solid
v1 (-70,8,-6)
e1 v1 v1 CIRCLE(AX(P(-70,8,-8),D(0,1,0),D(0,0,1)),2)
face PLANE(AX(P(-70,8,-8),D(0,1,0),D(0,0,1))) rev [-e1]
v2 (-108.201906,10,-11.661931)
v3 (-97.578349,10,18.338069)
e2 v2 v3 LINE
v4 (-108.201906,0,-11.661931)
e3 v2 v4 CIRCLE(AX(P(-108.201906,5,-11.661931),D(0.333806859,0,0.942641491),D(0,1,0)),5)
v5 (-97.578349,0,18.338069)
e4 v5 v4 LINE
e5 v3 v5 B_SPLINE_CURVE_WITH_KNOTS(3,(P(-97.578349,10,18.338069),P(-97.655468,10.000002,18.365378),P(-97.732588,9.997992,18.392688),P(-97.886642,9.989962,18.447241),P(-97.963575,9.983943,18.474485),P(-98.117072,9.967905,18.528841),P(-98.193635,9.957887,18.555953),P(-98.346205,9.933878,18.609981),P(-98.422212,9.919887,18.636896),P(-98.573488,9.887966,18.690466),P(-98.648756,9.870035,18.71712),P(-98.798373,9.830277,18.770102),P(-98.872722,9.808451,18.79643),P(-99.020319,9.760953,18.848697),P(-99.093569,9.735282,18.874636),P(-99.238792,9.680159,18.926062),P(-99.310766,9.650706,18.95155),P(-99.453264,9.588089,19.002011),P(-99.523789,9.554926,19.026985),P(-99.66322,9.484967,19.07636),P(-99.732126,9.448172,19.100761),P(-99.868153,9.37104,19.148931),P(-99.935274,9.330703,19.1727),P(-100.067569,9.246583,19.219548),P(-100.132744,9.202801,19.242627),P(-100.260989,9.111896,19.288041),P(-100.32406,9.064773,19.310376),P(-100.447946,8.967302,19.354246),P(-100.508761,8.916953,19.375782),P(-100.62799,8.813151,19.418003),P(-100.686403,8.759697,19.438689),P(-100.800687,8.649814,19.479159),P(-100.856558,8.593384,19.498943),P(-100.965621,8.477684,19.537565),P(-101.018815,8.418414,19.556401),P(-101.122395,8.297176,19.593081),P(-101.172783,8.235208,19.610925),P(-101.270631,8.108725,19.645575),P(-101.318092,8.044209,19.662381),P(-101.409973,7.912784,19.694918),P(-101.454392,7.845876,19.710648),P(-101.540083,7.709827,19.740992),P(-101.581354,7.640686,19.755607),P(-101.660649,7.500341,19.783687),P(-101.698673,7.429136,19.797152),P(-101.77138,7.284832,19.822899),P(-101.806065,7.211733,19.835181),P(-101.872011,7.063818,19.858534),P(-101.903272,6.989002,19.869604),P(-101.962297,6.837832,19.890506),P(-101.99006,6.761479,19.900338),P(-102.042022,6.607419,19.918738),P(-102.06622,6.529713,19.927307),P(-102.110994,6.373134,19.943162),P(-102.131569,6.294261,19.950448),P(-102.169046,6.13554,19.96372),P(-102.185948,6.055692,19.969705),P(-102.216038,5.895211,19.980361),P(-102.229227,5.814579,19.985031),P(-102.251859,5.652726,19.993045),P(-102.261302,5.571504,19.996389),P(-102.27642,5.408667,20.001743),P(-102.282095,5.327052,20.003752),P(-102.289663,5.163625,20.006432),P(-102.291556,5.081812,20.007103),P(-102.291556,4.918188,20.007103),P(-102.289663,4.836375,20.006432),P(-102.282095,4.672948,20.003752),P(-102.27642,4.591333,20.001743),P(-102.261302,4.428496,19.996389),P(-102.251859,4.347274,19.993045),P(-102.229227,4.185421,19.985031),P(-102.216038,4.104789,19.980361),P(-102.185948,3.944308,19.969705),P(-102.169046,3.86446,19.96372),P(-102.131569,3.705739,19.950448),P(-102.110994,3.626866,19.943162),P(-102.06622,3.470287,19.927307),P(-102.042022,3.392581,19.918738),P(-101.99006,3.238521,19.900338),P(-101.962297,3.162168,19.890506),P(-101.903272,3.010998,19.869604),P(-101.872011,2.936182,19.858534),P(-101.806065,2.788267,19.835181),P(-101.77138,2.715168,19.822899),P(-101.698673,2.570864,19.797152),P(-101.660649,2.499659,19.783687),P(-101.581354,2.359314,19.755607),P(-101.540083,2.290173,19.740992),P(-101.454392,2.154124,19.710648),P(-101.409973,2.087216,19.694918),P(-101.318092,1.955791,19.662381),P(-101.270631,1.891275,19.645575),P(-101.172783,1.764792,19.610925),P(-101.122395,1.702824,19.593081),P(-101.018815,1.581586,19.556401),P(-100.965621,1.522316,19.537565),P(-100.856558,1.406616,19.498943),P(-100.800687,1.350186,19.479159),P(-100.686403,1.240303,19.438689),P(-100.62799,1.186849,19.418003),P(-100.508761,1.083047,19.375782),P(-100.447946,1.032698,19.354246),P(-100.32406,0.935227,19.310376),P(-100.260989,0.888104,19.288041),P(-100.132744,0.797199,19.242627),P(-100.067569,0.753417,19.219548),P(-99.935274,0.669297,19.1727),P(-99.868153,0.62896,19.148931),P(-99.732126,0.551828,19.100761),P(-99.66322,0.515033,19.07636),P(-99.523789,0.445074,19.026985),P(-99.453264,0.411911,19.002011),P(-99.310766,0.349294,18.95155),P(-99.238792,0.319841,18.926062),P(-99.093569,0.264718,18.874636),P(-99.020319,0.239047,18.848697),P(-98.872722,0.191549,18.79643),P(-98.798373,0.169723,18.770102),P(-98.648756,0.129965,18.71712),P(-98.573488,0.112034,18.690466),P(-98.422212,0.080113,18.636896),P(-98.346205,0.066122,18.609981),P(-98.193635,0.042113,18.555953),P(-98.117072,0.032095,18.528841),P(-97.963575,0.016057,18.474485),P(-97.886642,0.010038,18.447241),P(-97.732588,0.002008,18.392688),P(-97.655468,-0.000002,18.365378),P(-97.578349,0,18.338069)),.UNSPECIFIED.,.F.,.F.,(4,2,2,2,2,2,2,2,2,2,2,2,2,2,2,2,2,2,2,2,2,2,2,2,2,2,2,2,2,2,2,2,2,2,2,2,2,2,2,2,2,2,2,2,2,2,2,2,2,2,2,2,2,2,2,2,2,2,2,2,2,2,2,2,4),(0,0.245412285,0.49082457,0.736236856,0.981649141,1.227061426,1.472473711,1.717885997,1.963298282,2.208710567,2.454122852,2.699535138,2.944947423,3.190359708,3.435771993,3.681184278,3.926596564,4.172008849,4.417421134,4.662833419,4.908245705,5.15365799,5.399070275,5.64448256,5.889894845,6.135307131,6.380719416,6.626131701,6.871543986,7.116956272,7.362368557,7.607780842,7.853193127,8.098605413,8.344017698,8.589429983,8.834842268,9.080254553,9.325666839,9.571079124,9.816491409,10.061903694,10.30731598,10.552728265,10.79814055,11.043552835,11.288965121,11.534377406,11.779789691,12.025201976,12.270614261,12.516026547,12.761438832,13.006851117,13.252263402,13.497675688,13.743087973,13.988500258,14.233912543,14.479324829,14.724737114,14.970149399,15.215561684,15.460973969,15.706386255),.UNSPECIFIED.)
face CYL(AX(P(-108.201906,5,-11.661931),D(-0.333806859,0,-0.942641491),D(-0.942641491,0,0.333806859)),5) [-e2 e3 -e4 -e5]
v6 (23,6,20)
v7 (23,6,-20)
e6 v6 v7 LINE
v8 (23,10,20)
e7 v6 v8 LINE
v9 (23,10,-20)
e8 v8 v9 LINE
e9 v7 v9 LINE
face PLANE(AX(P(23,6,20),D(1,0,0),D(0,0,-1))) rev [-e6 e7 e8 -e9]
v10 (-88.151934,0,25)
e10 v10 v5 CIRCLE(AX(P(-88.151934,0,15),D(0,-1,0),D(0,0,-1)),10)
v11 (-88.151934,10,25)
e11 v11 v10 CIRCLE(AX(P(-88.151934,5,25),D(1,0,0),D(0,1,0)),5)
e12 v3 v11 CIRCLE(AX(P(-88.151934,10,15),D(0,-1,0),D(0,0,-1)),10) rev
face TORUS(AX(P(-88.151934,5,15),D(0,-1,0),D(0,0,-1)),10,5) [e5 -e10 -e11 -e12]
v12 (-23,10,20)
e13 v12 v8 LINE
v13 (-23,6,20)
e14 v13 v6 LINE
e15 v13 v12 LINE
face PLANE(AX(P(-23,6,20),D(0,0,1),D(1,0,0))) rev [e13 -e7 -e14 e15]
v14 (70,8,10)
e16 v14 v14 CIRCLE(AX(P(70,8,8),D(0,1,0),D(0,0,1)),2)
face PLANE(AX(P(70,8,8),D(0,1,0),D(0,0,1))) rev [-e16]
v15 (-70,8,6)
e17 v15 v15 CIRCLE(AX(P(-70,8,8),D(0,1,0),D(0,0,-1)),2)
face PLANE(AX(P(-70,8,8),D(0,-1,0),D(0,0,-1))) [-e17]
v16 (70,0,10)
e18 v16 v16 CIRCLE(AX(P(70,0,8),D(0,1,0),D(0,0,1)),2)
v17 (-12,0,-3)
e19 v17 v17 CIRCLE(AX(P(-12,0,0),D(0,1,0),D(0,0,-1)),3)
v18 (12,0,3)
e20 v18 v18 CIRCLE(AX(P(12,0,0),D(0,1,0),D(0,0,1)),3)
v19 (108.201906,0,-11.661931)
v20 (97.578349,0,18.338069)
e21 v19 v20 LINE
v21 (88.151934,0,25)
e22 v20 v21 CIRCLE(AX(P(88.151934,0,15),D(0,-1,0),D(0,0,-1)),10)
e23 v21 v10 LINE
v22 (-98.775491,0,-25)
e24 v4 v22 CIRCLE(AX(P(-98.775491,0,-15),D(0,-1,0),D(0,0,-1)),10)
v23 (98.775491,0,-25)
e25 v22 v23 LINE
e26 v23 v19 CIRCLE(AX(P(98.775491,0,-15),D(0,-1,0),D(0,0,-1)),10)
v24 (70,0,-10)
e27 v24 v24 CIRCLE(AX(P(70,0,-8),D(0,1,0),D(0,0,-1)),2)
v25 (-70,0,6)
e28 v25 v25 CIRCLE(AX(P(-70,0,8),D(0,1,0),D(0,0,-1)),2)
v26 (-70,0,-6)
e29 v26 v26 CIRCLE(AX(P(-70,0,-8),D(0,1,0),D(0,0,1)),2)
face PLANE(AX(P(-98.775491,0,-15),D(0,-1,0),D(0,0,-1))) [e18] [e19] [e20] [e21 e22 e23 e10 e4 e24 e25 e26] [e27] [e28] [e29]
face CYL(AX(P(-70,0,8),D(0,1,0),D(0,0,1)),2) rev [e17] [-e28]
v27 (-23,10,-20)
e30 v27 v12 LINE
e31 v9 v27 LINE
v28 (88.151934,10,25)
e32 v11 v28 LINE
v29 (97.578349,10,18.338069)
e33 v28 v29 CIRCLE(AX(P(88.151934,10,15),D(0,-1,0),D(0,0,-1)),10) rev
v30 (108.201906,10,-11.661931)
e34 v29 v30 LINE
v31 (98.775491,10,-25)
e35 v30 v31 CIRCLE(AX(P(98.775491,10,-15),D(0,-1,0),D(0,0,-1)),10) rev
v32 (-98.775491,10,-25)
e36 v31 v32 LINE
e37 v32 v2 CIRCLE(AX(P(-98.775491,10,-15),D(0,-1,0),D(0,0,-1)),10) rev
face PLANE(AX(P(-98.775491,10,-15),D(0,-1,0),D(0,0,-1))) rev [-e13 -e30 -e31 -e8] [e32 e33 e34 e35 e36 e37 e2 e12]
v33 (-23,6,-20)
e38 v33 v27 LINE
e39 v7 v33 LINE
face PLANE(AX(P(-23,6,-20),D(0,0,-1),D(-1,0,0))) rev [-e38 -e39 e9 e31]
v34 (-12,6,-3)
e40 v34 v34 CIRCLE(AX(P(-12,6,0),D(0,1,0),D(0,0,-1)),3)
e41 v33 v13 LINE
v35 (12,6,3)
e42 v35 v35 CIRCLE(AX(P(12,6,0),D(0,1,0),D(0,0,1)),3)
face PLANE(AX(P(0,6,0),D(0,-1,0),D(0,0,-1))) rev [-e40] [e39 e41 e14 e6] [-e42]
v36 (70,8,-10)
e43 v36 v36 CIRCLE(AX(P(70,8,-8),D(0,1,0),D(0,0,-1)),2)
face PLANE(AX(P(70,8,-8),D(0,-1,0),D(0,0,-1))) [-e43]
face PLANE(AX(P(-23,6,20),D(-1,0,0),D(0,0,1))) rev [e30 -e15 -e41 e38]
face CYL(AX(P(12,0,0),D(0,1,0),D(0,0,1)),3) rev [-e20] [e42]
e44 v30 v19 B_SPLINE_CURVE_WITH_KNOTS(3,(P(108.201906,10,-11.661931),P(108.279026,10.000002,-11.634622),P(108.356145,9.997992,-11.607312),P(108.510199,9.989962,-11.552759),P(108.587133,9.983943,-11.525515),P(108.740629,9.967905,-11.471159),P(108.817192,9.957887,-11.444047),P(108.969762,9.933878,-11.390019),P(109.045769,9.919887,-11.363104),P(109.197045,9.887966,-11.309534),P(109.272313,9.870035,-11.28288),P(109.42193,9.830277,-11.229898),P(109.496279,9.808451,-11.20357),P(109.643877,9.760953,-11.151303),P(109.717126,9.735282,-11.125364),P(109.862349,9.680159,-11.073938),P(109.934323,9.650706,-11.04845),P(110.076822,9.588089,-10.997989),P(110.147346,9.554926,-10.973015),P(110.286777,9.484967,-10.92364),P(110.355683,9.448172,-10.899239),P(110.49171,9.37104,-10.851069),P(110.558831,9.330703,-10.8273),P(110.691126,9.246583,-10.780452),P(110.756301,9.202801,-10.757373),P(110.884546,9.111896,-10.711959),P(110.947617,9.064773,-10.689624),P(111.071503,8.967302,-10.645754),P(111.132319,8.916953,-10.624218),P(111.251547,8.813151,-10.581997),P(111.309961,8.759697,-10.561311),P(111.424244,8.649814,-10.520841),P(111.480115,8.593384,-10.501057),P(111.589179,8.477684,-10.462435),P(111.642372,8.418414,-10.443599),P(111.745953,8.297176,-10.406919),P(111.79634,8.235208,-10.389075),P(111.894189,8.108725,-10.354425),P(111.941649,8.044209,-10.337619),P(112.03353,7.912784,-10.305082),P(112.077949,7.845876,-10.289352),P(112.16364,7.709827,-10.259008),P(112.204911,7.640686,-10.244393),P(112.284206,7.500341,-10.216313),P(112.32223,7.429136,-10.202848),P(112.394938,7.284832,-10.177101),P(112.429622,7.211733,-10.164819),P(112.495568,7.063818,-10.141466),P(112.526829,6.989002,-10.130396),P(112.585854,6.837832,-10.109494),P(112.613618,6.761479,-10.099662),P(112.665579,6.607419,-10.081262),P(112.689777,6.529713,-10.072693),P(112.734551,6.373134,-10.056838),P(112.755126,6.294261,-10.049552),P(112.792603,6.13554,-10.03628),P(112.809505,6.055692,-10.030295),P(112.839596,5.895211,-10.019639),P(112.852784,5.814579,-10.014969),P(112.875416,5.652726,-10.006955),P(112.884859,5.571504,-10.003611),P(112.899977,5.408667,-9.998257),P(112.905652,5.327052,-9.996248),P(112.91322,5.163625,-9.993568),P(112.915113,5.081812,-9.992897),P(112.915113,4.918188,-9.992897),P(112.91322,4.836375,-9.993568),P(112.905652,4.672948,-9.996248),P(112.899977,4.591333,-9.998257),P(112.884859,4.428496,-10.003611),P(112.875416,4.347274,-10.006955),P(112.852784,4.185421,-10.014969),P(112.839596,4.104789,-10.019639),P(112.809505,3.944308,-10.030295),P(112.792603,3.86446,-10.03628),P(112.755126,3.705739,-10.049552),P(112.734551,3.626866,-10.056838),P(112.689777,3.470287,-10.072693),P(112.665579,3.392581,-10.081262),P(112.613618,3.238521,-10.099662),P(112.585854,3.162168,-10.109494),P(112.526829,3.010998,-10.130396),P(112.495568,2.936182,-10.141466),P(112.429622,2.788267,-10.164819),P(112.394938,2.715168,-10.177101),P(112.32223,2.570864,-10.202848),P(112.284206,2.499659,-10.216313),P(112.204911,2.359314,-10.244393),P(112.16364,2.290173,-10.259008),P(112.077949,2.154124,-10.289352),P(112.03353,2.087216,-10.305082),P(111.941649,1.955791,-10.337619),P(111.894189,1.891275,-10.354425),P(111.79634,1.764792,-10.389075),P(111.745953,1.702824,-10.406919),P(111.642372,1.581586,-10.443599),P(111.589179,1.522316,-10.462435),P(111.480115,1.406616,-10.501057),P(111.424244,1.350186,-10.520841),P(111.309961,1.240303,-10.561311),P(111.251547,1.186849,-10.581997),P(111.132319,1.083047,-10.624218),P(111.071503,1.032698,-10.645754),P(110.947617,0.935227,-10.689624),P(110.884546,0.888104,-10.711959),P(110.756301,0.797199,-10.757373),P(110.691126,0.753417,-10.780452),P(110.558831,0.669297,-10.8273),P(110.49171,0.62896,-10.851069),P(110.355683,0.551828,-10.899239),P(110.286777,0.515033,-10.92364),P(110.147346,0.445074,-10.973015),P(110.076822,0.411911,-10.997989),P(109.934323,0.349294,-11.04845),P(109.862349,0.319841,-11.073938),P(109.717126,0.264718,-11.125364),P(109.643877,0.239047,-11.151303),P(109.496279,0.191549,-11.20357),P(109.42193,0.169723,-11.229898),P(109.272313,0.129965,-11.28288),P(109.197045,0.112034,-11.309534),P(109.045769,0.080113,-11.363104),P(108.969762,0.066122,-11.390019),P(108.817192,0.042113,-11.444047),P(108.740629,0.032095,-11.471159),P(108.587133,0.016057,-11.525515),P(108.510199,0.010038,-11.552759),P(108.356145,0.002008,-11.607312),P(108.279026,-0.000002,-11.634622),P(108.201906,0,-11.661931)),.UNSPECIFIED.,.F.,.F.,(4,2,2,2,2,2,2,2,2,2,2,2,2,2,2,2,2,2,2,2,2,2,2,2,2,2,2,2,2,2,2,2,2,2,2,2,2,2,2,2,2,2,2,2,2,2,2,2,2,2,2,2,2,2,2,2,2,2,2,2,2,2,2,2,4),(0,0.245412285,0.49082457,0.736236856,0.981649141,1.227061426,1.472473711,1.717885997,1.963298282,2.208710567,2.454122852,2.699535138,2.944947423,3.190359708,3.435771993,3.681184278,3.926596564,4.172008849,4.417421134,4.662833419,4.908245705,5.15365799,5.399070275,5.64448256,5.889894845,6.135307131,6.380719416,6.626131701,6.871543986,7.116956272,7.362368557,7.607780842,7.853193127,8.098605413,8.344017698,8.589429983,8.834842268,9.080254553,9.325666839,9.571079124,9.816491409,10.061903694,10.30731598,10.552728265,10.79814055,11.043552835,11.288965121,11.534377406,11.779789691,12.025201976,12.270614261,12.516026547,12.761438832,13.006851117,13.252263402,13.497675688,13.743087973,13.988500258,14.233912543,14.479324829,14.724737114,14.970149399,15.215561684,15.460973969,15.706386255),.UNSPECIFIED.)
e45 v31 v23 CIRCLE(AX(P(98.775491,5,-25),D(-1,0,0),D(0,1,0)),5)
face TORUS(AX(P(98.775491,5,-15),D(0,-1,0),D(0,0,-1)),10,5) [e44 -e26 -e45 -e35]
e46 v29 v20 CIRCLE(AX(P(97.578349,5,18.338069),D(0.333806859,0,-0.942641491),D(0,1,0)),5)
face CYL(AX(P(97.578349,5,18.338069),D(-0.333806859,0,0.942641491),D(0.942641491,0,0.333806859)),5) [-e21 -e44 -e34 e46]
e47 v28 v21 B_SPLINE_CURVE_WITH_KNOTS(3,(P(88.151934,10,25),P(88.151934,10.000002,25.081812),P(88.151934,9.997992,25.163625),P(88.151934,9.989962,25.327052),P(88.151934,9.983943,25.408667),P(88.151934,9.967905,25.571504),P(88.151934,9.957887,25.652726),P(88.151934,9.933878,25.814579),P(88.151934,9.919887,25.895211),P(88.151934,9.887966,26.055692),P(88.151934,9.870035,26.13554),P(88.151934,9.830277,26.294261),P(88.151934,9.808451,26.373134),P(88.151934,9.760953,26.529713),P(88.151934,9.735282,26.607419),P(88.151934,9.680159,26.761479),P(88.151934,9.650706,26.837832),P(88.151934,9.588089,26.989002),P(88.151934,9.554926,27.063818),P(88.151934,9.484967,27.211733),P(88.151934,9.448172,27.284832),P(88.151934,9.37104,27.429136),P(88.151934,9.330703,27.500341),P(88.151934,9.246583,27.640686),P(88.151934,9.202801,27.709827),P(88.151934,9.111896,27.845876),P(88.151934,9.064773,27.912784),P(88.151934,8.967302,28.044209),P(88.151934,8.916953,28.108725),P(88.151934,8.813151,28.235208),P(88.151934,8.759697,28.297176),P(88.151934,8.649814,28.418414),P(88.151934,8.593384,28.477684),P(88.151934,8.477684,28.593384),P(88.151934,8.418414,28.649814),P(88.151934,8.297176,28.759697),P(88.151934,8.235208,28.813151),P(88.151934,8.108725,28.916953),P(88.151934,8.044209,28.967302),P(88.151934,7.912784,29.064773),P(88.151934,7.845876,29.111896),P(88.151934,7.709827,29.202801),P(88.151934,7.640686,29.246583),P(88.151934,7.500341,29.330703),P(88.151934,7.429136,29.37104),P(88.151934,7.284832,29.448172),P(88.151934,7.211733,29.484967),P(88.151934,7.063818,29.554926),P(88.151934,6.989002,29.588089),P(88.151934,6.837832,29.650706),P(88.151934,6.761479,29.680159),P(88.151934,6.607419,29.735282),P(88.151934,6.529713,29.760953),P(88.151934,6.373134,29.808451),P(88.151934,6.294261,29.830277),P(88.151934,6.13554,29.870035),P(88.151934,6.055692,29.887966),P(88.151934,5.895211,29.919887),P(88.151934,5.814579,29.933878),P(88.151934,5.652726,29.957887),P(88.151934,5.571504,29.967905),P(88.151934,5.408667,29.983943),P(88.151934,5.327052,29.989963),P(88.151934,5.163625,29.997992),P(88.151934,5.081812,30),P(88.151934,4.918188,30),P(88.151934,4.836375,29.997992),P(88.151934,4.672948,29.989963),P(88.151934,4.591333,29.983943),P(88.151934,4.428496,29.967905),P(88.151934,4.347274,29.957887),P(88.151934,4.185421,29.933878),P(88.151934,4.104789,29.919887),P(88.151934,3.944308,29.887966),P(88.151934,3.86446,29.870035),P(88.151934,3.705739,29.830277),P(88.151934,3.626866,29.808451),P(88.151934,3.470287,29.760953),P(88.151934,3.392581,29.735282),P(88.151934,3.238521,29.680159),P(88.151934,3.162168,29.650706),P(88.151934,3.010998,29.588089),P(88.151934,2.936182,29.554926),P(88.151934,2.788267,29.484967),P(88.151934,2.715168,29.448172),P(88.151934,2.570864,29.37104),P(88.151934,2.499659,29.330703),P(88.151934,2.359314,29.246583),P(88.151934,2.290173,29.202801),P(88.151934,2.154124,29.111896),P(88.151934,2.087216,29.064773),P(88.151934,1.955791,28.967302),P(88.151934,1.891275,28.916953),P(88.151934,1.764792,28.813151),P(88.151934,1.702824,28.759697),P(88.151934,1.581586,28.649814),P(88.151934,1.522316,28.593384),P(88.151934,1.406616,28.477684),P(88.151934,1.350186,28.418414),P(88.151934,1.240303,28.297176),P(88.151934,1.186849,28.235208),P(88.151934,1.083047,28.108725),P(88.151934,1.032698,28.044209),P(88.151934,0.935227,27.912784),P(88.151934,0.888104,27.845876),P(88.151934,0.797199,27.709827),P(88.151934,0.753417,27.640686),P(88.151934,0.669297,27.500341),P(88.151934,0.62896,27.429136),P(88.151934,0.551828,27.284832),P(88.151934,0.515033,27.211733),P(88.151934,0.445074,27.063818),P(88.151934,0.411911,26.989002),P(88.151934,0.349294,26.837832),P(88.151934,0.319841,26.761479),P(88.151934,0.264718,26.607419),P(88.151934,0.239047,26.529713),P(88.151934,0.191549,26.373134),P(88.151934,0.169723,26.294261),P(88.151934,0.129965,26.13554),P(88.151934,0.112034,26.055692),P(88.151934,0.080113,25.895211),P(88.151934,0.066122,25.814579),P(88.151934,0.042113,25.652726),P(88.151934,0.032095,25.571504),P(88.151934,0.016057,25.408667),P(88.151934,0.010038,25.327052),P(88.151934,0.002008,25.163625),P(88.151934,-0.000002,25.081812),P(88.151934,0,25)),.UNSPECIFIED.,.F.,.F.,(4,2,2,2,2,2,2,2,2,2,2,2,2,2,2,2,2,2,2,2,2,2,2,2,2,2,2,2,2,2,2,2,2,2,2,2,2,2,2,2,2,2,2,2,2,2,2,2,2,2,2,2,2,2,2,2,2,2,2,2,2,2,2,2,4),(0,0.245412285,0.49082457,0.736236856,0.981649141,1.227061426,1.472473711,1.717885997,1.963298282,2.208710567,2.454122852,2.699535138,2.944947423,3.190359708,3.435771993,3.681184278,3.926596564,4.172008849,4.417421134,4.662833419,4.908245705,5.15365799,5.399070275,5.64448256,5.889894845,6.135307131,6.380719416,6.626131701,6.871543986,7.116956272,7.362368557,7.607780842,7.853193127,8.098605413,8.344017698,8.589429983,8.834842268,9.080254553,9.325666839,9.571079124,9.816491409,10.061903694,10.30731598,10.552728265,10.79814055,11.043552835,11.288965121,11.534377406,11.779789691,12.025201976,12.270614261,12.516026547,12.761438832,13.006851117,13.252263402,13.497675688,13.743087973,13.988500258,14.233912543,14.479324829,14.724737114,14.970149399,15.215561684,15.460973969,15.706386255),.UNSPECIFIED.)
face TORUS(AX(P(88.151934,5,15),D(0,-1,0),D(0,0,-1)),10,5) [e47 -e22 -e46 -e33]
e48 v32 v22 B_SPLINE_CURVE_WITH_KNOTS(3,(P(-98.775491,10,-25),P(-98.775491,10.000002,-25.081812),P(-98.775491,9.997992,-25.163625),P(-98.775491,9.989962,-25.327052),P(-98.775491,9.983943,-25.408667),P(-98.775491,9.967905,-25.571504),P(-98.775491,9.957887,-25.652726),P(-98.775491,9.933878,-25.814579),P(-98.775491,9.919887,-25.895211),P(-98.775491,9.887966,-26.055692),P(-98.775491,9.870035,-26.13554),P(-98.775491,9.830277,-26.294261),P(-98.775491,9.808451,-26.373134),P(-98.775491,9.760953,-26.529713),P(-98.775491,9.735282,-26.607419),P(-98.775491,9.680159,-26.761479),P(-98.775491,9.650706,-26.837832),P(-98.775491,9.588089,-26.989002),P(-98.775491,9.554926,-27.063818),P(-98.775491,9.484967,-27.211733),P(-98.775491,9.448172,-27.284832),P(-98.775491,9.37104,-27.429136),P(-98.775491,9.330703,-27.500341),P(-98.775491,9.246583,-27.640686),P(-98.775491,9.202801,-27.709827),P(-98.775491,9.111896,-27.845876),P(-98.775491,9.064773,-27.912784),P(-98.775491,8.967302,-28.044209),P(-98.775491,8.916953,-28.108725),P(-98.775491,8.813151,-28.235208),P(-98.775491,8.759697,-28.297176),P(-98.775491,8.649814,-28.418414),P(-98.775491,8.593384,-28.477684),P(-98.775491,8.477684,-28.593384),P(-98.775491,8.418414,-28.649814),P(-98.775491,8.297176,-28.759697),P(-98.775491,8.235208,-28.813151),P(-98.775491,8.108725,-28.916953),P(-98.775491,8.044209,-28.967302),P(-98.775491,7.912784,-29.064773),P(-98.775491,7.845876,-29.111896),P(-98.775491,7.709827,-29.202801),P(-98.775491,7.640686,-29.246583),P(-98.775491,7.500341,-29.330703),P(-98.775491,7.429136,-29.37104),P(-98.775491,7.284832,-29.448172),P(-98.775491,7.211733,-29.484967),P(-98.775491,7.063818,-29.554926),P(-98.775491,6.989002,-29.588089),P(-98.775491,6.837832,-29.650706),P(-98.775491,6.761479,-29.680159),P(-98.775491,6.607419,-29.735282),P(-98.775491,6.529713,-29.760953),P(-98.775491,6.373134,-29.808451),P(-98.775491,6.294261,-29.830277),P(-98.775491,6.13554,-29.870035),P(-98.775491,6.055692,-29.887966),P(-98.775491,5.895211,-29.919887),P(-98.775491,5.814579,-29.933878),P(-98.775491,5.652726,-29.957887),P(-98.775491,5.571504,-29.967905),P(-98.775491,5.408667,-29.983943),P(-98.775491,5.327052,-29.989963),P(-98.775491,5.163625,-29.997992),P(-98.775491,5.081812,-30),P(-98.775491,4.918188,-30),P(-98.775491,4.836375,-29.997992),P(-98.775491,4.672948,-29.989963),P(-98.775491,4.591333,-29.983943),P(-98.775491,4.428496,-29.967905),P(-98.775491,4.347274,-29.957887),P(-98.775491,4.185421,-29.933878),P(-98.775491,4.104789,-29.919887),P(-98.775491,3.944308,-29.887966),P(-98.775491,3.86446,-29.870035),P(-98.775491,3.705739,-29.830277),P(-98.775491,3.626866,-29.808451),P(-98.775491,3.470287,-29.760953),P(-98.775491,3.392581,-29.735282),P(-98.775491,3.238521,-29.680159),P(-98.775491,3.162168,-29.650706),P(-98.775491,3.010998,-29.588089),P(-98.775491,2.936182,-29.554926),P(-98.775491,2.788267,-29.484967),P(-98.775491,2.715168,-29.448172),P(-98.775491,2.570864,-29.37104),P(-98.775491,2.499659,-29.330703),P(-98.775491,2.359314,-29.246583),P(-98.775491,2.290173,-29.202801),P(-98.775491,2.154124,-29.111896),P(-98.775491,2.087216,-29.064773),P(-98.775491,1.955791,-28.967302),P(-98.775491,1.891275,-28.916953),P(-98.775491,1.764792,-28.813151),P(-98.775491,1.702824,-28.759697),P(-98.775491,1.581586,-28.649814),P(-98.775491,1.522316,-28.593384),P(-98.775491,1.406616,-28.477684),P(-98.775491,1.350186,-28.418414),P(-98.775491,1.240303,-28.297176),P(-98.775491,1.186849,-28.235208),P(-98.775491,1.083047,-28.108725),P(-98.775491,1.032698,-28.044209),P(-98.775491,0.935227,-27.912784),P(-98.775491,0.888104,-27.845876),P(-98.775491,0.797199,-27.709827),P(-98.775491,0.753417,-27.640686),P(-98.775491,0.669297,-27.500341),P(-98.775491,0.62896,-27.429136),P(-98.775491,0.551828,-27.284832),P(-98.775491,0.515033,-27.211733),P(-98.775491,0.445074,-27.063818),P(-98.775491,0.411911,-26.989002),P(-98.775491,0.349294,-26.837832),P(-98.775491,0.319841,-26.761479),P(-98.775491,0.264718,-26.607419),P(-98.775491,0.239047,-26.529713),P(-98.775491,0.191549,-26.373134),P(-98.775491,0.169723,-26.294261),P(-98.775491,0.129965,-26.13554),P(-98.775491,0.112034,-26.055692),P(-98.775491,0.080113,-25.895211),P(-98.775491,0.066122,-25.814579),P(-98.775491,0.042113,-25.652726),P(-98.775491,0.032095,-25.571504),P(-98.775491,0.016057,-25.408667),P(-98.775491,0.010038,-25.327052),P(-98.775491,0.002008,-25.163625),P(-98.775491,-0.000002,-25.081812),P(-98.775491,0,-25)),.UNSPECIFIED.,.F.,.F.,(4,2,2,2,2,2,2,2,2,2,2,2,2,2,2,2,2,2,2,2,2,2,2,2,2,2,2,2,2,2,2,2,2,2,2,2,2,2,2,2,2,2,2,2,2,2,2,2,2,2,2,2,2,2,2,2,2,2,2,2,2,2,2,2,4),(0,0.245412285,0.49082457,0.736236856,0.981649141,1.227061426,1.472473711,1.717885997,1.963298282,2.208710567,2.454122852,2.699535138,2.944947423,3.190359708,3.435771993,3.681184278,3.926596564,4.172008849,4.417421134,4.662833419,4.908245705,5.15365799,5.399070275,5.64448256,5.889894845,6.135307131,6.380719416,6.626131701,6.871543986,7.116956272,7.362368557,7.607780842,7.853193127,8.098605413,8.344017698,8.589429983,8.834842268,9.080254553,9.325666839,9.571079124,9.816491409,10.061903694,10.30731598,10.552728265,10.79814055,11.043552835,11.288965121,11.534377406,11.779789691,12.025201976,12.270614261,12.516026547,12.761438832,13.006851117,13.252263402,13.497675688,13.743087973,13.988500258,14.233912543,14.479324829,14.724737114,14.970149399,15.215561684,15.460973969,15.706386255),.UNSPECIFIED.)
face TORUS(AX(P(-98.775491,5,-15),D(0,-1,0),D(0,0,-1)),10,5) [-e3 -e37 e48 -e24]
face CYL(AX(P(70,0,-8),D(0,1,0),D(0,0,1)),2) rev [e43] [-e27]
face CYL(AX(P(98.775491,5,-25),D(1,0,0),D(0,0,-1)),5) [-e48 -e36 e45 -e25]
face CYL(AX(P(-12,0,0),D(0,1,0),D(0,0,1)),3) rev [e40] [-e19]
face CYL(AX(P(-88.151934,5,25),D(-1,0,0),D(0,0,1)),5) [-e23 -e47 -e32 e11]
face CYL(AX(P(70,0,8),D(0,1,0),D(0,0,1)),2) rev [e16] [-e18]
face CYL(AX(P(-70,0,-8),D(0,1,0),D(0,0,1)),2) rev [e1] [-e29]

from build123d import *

# Parameters (mm, degrees)
BOSS_EXTRUDE2_DEPTH = 10
FILLET2_R           = 5
SKETCH3_W           = 46
SKETCH3_H           = 40
CUT_EXTRUDE1_DEPTH  = 4
SKETCH4_R           = 3
CUT_EXTRUDE2_DEPTH  = 6
CUT_EXTRUDE3_START  = -2
SKETCH5_R           = 2
CUT_EXTRUDE3_DEPTH  = 8


with BuildPart() as part:
    # Sketch1 → Boss-Extrude2 (new body)
    with BuildSketch(Plane(origin=(0, 0, 0), x_dir=(1, 0, 0), z_dir=(0, 1, 0))):
        with BuildLine():
            Line((-112.915113285, 9.992897111), (-102.291556109, -20.007102889))
            ThreePointArc((-102.291556109, -20.007102889), (-96.809111593, -27.249623327), (-88.151933742, -30))
            Line((-88.151933742, -30), (88.151933742, -30))
            ThreePointArc((88.151933742, -30), (96.809111593, -27.249623327), (102.291556109, -20.007102889))
            Line((102.291556109, -20.007102889), (112.915113285, 9.992897111))
            ThreePointArc((112.915113285, 9.992897111), (111.025114246, 23.657177851), (98.775490918, 30))
            Line((98.775490918, 30), (-98.775490918, 30))
            ThreePointArc((-98.775490918, 30), (-111.025114246, 23.657177851), (-112.915113285, 9.992897111))
        make_face()
    extrude(amount=BOSS_EXTRUDE2_DEPTH)

    # Fillet2
    fillet2_edges = [part.edges().sort_by_distance(p)[0] for p in [
        (111.025114246, 10, -23.657177851),
        (0, 0, -30),
        (-111.025114246, 0, -23.657177851),
        (107.603334697, 10, 5.007102889),
        (96.809111593, 10, 27.249623327),
        (0, 10, 30),
        (-96.809111593, 10, 27.249623327),
        (-107.603334697, 10, 5.007102889),
        (0, 10, -30),
        (-107.603334697, 0, 5.007102889),
        (0, 0, 30),
        (107.603334697, 0, 5.007102889),
    ]]
    fillet(fillet2_edges, radius=FILLET2_R - 0.0001)  # a hair under: the kernel refuses the full size

    # Sketch3 → Cut-Extrude1 (cut)
    with BuildSketch(Plane(origin=(0, 10, 0), x_dir=(1, 0, 0), z_dir=(0, 1, 0))):
        Rectangle(SKETCH3_W, SKETCH3_H)
    extrude(amount=-CUT_EXTRUDE1_DEPTH, mode=Mode.SUBTRACT)

    # Sketch4 → Cut-Extrude2 (cut)
    with BuildSketch(Plane(origin=(0, 6, 0), x_dir=(1, 0, 0), z_dir=(0, 1, 0))):
        with Locations(Location((12, 0, 0), (0, 0, 270))):
            Circle(SKETCH4_R)
        with Locations(Location((-12, 0, 0), (0, 0, 90))):
            Circle(SKETCH4_R)
    extrude(amount=-CUT_EXTRUDE2_DEPTH, mode=Mode.SUBTRACT)

    # Sketch5 → Cut-Extrude3 (cut)
    with BuildSketch(Plane(origin=(0, 10, 0), x_dir=(1, 0, 0), z_dir=(0, 1, 0)).offset(CUT_EXTRUDE3_START)):
        with Locations(Location((-70, 8, 0), (0, 0, 270))):
            Circle(SKETCH5_R)
        with Locations(Location((-70, -8, 0), (0, 0, 90))):
            Circle(SKETCH5_R)
        with Locations(Location((70, -8, 0), (0, 0, 270))):
            Circle(SKETCH5_R)
        with Locations(Location((70, 8, 0), (0, 0, 90))):
            Circle(SKETCH5_R)
    extrude(amount=-CUT_EXTRUDE3_DEPTH, mode=Mode.SUBTRACT)


solid = part.part
